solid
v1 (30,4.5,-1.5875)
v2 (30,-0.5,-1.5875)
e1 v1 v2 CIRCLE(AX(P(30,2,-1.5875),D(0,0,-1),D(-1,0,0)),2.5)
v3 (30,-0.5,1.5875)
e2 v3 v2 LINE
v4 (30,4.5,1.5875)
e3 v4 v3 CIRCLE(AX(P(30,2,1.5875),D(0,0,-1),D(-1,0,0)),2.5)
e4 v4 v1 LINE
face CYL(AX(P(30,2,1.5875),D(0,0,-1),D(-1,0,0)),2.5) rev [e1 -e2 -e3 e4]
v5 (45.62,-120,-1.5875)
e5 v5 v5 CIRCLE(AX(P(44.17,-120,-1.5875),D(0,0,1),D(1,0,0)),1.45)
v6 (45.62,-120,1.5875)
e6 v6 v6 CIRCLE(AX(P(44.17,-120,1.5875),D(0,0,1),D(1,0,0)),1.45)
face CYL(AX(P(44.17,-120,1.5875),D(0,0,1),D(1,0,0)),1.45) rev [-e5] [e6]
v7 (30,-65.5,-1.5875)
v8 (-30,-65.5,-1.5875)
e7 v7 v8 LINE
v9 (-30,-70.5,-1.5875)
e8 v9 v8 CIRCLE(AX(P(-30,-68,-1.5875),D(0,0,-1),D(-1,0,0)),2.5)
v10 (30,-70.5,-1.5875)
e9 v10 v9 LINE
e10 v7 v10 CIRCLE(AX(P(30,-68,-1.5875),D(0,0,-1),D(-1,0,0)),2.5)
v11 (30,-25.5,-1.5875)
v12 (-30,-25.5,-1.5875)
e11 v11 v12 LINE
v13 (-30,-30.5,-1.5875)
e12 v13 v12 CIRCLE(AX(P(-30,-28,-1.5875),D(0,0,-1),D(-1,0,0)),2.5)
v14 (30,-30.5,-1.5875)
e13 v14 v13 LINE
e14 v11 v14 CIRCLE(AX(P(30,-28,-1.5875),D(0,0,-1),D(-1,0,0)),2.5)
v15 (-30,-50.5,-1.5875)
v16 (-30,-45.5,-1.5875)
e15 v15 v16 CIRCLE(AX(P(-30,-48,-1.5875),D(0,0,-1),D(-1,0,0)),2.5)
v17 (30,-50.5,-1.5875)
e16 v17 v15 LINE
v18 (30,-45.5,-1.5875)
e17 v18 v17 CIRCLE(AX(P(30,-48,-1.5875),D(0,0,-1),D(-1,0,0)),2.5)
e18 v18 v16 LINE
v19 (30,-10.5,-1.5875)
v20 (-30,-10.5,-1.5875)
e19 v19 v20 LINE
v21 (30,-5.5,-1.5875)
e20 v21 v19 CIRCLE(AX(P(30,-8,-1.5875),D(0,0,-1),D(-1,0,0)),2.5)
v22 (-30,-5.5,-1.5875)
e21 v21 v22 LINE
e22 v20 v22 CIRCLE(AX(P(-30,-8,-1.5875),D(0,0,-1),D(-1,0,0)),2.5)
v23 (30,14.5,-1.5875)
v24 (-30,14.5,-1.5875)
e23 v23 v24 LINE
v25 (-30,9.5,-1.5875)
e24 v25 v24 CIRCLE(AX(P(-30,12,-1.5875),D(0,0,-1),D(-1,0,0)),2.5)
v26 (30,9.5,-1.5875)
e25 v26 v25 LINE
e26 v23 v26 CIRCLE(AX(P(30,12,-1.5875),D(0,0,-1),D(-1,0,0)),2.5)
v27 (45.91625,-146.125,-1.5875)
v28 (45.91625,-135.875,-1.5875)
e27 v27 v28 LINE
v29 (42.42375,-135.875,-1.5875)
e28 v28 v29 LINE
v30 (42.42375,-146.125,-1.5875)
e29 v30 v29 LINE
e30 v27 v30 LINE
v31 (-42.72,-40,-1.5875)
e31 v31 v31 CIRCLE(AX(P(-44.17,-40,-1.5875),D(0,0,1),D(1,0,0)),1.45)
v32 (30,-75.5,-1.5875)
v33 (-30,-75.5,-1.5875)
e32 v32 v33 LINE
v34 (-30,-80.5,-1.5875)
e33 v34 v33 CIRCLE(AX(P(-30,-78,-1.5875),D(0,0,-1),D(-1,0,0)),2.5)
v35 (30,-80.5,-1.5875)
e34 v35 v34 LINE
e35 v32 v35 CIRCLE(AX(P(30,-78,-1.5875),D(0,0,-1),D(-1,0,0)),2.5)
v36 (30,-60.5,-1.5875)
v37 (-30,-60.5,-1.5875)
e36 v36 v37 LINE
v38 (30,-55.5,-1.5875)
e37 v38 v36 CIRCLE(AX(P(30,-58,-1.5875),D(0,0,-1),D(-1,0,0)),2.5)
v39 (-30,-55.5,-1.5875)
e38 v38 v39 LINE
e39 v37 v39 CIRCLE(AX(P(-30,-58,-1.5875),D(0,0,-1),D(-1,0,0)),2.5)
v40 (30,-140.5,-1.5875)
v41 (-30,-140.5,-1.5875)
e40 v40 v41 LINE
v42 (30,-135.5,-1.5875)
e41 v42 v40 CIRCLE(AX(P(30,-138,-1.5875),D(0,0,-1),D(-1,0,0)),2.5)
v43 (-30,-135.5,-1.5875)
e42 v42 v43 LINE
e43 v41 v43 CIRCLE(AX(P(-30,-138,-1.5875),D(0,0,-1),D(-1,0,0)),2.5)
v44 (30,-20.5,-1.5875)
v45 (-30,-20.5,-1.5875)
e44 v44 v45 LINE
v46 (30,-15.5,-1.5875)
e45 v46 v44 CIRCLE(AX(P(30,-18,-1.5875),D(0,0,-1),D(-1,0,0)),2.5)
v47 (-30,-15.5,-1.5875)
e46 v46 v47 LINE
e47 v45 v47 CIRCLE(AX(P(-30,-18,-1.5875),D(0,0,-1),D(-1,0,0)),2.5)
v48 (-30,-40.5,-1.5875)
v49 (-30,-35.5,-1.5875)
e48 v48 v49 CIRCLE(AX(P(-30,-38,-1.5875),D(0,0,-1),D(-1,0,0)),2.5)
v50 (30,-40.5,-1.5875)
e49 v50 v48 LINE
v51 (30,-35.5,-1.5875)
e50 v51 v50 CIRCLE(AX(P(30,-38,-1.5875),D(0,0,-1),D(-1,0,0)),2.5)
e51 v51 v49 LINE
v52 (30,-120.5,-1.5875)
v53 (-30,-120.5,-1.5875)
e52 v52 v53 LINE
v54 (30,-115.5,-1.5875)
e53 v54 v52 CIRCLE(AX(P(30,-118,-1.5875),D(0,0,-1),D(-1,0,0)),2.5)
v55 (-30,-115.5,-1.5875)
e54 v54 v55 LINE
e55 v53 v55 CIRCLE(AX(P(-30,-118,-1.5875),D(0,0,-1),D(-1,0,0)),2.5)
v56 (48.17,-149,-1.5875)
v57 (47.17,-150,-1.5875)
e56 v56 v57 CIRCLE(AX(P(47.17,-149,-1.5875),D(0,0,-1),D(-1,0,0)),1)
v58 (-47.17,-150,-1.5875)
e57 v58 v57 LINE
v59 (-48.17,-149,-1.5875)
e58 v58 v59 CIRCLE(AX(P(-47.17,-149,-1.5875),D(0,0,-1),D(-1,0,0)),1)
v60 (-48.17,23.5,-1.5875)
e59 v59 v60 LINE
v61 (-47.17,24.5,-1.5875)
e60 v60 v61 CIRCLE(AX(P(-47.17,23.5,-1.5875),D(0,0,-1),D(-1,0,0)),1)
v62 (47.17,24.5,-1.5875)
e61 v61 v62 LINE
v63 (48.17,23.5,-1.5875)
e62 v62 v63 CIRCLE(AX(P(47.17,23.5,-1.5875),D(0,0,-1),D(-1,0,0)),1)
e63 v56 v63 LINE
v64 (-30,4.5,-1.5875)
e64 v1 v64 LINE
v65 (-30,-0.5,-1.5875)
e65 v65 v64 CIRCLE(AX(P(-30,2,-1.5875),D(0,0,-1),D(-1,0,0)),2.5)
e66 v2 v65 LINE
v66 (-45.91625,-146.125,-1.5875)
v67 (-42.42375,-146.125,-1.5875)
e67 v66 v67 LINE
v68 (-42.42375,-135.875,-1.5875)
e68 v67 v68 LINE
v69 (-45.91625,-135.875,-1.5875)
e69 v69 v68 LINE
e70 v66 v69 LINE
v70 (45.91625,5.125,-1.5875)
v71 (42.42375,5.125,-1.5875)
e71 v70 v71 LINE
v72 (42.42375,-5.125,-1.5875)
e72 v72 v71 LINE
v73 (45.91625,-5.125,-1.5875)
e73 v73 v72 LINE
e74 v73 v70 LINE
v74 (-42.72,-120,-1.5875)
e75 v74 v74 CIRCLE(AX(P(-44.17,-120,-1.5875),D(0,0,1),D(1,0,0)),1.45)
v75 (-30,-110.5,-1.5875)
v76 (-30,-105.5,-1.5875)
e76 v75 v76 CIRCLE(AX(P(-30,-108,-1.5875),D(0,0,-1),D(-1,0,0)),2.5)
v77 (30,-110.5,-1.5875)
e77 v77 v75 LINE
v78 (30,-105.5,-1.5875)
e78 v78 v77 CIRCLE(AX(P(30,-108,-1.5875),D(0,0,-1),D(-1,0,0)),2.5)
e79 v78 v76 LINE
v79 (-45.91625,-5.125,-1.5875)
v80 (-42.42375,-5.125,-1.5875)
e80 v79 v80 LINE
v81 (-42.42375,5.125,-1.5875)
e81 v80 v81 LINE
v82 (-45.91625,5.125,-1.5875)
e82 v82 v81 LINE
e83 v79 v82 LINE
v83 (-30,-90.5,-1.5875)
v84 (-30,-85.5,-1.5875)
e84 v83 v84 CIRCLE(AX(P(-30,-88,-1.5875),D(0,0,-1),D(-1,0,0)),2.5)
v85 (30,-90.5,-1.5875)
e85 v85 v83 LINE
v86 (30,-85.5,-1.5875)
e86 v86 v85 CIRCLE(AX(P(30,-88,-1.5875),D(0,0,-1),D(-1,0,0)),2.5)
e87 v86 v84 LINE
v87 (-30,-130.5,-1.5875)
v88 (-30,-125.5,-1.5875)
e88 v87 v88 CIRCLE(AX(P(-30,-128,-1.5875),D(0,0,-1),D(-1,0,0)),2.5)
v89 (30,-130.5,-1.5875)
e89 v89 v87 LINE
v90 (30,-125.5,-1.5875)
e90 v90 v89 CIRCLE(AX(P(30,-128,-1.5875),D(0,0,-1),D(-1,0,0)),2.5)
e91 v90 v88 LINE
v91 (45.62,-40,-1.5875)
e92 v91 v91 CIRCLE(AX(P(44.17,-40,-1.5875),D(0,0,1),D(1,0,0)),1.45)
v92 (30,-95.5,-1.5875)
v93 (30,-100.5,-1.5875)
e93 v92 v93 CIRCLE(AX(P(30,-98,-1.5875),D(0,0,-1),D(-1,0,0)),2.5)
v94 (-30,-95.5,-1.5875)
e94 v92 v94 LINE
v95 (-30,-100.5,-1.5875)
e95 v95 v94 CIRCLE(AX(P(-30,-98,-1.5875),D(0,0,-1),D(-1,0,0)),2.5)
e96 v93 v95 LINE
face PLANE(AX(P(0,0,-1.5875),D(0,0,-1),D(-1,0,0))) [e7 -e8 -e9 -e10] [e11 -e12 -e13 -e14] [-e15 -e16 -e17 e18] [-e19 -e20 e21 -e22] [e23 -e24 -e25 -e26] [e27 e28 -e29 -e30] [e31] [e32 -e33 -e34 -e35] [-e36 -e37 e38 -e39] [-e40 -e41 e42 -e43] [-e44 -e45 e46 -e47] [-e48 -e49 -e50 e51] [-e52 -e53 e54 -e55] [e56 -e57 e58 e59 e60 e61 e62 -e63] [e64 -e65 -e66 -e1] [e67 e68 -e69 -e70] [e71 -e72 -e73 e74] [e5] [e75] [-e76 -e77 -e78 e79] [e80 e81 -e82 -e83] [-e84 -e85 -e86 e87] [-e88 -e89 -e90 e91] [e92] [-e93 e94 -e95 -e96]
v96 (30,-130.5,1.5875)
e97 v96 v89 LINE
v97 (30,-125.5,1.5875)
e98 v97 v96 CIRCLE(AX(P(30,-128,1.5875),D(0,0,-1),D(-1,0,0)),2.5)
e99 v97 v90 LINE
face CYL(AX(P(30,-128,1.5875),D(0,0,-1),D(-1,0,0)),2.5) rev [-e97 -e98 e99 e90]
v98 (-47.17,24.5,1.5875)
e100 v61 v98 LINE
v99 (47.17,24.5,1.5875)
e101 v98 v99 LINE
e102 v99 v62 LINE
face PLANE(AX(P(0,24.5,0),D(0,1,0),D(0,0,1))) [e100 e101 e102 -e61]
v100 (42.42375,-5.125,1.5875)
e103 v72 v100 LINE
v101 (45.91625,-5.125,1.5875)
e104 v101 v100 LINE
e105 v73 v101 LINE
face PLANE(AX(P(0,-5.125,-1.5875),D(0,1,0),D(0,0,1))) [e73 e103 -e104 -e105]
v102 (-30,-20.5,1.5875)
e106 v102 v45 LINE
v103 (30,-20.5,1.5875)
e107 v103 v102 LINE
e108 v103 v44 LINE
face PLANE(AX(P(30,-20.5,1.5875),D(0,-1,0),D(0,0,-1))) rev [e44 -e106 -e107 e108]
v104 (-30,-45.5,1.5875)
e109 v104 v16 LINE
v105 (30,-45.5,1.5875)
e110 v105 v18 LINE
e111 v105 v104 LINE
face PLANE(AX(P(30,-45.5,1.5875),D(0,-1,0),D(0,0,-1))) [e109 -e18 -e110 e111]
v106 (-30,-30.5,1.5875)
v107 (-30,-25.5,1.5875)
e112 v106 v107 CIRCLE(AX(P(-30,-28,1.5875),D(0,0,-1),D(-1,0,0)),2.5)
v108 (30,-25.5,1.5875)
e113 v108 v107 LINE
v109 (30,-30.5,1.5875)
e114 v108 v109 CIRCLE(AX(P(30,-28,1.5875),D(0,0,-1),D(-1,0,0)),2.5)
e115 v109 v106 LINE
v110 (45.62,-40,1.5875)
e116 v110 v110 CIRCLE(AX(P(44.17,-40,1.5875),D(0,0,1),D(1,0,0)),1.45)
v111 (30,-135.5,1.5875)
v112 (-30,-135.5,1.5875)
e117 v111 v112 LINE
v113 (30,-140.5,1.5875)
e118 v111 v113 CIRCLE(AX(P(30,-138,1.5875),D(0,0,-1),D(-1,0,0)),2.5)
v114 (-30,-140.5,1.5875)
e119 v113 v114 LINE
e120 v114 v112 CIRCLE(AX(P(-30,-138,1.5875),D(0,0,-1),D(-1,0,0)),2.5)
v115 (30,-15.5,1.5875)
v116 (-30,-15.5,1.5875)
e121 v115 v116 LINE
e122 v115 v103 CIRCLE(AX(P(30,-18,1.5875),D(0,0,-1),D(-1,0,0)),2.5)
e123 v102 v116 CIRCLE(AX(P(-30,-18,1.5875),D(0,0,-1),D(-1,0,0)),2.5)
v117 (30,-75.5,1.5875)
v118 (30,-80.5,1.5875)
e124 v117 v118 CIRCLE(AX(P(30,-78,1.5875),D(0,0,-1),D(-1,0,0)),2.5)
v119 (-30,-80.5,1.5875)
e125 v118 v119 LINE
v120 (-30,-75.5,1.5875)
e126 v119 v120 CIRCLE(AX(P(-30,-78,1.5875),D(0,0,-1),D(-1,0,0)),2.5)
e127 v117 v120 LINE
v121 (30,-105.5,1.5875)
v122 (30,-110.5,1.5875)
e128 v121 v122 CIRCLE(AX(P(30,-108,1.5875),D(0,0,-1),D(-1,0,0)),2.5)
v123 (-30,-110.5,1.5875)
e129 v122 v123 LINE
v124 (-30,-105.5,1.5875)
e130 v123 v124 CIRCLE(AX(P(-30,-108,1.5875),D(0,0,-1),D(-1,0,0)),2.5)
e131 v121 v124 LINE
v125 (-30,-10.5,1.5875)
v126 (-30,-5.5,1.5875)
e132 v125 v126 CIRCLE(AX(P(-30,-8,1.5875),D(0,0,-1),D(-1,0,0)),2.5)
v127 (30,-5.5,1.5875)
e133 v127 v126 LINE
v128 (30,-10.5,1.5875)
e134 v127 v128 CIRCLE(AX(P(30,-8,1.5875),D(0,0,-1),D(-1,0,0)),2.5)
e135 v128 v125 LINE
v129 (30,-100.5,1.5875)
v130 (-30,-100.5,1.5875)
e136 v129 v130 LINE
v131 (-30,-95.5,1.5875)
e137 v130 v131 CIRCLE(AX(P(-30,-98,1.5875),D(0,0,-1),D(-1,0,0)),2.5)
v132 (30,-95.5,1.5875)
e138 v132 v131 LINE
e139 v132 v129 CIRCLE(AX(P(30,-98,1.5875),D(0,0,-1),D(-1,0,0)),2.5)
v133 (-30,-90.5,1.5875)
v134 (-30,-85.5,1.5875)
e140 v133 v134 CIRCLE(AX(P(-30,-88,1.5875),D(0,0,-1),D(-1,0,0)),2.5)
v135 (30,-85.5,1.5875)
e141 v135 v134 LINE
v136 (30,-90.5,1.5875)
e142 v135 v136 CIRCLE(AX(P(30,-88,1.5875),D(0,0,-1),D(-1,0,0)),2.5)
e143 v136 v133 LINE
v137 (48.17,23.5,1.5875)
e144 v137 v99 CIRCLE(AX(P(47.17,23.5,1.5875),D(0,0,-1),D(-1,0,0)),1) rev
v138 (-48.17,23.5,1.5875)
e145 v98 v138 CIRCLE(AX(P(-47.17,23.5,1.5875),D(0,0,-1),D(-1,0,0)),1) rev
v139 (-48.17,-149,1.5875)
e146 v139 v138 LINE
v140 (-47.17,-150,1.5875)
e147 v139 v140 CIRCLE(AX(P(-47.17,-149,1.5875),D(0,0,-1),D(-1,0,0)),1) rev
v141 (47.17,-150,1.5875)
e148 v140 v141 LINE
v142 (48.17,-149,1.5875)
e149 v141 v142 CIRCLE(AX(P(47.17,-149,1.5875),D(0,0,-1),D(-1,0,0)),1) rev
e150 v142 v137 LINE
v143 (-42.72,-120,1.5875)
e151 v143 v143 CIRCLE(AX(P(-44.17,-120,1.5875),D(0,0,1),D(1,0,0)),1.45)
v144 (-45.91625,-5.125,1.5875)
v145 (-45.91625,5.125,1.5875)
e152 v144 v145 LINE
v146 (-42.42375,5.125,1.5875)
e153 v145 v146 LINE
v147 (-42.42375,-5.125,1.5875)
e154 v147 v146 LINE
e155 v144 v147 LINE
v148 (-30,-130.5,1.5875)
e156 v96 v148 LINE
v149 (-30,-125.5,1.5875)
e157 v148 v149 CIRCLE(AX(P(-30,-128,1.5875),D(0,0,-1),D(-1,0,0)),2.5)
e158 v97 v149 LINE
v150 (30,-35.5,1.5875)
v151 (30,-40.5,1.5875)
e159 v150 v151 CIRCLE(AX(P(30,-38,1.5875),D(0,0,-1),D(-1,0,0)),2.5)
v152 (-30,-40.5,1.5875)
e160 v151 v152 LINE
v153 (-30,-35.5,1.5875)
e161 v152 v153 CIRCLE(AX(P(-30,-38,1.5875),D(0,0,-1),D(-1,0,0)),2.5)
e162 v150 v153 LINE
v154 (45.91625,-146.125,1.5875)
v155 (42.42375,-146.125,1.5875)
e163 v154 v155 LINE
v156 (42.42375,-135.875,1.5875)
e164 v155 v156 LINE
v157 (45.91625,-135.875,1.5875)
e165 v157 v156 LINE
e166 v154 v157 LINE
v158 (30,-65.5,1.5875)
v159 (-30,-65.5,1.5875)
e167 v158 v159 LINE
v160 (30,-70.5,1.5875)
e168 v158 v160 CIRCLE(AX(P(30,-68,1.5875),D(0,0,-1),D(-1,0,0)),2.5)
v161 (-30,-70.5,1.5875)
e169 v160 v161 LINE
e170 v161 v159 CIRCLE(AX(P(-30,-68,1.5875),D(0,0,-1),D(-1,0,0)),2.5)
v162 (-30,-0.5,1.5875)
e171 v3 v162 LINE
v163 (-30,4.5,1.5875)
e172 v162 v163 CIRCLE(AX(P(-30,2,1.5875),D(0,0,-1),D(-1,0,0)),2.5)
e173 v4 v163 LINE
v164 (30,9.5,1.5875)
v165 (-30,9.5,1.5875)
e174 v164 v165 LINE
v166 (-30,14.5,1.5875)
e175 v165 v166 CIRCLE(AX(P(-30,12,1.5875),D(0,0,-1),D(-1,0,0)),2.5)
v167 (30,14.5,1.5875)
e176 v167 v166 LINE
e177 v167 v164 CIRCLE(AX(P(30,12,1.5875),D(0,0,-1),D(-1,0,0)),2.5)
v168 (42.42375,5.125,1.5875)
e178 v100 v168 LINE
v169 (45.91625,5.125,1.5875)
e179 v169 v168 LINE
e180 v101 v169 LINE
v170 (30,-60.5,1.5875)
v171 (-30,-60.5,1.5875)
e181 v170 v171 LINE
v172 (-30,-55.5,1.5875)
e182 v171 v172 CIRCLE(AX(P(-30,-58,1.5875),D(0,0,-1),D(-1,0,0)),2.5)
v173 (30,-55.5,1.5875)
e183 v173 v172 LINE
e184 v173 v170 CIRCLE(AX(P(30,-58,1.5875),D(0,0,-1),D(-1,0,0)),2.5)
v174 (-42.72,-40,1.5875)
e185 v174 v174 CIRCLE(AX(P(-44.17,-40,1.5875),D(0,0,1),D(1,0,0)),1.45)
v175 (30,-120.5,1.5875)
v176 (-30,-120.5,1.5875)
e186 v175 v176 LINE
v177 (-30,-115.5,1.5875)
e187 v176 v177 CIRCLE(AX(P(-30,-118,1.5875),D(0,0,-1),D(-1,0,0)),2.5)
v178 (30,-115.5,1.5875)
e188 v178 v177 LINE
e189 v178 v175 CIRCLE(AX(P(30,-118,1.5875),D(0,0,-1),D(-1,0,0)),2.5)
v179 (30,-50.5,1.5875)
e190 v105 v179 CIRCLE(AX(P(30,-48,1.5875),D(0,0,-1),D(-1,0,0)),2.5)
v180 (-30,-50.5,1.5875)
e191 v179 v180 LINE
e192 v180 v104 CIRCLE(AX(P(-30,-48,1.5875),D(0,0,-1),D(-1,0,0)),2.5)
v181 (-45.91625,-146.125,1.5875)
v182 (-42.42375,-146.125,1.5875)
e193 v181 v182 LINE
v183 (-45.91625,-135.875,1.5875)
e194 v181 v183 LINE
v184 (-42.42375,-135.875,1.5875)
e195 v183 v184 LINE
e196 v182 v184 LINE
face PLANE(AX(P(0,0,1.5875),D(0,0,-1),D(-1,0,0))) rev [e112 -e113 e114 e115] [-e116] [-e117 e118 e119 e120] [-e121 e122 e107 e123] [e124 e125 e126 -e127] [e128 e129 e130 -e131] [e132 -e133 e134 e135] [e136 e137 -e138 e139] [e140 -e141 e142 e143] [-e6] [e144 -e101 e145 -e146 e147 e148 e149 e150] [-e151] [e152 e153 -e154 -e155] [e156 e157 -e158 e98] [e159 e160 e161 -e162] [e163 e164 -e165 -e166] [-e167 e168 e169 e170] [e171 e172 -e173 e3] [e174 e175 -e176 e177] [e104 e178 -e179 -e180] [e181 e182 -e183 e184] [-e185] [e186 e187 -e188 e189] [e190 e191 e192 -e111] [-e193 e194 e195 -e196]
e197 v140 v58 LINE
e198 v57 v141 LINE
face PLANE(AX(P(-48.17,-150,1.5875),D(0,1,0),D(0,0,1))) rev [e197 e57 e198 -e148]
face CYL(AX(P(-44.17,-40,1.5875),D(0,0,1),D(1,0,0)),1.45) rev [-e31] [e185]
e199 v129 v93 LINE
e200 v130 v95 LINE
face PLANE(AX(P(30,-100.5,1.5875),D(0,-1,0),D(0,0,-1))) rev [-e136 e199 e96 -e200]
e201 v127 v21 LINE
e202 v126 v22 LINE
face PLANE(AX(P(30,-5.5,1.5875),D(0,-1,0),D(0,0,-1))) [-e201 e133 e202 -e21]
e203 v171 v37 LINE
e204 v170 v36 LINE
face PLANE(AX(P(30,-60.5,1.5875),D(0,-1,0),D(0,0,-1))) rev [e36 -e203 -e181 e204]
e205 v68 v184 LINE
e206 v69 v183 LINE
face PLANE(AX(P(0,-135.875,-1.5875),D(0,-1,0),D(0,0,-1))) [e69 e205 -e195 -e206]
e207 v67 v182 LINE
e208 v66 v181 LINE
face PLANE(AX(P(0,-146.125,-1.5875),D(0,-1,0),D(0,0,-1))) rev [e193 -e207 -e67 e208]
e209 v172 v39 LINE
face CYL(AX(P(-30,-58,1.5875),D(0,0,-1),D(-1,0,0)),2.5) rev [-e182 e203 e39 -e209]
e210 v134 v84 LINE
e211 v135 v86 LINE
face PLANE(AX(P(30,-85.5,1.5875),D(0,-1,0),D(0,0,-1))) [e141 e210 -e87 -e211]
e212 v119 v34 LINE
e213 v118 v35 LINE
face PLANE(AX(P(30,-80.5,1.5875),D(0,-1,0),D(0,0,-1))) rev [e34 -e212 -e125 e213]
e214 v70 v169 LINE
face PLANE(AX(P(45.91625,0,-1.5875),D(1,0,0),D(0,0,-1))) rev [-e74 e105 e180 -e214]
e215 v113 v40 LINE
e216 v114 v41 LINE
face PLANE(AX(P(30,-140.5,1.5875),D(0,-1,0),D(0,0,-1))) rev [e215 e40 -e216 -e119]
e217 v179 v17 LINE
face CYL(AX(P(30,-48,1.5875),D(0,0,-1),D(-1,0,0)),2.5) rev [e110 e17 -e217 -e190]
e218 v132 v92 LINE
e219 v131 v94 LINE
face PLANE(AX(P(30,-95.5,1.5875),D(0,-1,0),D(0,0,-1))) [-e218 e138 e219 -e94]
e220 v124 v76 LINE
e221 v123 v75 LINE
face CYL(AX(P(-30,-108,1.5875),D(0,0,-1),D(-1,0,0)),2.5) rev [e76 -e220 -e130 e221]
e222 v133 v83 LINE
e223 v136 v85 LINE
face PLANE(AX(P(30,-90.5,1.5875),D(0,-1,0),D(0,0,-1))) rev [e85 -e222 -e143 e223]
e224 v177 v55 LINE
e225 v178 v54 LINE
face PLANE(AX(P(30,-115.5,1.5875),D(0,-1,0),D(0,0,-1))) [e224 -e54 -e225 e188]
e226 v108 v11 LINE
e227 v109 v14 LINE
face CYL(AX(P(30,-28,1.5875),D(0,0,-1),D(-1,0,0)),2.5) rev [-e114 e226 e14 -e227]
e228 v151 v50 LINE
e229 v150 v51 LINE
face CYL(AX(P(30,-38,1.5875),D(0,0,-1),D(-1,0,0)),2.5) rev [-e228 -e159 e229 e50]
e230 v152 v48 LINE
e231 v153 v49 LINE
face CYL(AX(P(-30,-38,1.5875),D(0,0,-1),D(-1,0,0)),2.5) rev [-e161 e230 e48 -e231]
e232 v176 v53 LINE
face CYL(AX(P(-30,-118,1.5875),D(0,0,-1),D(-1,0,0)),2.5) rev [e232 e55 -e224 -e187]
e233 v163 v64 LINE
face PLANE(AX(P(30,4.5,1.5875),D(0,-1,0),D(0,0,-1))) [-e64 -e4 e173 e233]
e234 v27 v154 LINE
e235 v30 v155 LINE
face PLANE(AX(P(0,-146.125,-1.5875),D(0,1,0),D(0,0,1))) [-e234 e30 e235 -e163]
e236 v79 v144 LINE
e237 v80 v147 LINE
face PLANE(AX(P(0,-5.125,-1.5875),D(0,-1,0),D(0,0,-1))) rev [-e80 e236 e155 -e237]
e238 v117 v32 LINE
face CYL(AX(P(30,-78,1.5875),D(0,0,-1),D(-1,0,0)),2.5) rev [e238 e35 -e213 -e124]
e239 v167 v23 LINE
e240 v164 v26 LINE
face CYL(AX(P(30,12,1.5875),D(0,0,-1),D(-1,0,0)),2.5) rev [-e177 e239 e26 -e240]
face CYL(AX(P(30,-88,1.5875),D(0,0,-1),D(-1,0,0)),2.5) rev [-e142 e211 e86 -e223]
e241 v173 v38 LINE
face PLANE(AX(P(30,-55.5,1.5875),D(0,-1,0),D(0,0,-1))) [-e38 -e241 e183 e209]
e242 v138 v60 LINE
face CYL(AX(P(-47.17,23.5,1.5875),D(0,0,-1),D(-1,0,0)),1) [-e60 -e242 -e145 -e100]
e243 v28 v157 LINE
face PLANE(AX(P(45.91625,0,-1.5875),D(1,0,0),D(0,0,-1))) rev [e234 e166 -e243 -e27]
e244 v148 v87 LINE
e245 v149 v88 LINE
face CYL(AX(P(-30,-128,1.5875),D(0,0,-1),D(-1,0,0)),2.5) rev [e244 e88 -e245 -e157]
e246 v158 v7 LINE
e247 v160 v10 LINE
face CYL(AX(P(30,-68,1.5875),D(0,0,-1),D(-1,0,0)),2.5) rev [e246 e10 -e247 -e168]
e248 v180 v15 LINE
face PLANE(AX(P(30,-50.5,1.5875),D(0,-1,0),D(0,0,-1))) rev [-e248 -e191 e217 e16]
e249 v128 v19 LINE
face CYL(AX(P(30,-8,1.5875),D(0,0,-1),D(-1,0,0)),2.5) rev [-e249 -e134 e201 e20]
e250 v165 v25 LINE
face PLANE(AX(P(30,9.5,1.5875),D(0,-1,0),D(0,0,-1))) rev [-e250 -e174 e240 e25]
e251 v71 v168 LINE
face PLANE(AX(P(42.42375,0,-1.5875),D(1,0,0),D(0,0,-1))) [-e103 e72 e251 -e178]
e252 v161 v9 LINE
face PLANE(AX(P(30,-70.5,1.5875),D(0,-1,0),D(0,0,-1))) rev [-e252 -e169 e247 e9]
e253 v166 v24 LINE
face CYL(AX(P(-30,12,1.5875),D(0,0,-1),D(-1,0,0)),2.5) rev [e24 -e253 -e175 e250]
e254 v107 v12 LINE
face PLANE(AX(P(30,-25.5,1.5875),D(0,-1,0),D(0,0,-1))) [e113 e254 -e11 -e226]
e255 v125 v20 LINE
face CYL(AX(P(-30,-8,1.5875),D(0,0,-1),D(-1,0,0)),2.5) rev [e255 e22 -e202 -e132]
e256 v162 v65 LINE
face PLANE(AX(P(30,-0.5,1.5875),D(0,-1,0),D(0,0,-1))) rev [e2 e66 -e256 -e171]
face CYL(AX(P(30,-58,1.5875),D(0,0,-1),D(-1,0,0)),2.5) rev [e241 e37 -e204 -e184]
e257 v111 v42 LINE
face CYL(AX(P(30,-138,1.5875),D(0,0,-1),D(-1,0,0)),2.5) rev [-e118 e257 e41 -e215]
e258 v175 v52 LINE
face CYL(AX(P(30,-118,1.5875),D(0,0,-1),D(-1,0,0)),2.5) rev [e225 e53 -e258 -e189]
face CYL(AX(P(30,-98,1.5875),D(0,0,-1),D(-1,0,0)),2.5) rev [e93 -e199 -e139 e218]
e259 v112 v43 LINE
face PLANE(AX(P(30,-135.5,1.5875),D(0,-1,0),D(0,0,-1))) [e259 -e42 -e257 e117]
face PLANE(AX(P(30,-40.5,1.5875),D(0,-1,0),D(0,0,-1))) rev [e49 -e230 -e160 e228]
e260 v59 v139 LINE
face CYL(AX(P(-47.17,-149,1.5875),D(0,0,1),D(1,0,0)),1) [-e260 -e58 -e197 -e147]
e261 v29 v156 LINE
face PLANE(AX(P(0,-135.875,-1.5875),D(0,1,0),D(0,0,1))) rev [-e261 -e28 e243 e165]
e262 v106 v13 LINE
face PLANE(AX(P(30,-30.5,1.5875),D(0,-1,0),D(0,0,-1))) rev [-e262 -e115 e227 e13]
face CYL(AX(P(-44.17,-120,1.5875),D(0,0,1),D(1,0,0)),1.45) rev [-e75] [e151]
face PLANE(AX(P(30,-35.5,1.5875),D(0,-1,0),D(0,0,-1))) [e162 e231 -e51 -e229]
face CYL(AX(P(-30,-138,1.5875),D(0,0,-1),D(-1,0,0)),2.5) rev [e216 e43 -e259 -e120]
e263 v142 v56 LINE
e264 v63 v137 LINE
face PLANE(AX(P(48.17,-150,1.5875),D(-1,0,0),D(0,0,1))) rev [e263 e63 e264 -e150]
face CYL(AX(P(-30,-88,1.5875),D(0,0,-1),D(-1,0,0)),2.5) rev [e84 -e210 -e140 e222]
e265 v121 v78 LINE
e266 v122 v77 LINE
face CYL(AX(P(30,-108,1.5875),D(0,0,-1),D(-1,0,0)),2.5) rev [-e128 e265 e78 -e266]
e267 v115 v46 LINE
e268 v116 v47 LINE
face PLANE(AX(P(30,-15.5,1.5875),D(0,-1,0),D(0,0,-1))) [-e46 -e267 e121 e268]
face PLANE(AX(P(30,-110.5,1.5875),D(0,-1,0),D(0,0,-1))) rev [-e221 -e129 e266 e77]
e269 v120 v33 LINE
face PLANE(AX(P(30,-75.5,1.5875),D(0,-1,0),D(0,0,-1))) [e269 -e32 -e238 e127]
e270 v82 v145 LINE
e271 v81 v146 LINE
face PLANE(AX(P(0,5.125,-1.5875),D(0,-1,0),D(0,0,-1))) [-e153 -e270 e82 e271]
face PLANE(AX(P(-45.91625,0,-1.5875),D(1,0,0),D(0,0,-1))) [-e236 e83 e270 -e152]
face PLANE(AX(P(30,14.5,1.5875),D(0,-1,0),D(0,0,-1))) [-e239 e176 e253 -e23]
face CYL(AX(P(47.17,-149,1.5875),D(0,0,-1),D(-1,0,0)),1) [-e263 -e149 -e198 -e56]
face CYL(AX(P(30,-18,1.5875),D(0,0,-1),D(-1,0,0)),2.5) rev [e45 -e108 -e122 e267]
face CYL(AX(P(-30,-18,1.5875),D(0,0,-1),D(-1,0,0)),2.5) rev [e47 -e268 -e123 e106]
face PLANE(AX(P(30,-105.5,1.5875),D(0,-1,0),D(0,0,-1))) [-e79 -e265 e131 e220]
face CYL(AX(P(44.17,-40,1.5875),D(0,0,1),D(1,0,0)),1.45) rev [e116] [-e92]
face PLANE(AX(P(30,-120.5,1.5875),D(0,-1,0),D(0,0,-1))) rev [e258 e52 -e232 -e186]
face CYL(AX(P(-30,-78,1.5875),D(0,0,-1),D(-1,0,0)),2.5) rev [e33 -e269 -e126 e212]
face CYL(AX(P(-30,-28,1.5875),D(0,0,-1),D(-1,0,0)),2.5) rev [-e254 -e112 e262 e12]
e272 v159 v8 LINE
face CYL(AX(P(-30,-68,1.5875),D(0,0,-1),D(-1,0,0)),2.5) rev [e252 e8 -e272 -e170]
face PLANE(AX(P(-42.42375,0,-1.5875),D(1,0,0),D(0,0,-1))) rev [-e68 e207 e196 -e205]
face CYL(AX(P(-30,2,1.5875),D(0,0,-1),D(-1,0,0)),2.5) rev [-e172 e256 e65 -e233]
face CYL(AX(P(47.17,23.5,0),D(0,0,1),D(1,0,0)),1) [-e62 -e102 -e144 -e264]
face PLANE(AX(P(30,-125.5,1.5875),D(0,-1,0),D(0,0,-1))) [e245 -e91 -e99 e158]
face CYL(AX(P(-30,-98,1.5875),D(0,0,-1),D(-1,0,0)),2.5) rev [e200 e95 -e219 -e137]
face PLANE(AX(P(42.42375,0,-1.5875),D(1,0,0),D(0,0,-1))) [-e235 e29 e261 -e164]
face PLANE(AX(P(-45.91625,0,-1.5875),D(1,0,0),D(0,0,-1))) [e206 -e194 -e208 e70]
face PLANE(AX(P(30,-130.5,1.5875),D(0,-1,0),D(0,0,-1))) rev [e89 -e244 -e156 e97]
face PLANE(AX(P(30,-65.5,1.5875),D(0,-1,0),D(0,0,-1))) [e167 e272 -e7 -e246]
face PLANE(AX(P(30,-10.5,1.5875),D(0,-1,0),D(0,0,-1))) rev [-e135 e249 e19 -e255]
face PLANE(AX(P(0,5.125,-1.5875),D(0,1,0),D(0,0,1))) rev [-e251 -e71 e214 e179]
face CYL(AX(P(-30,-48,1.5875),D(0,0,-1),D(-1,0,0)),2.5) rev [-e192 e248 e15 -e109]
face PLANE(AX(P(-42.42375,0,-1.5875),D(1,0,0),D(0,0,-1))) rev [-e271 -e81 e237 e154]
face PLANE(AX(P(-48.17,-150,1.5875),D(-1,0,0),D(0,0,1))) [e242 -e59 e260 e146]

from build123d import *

# Parameters (mm, degrees)
STOCK_TORSO_REAR_PLATE_1_START       = -1.5875
STOCK_TORSO_REAR_PLATE_1_OUTLINE_W   = 96.34
STOCK_TORSO_REAR_PLATE_1_OUTLINE_H   = 174.5
STOCK_TORSO_REAR_PLATE_1_OUTLINE_W_2 = 3.4925
STOCK_TORSO_REAR_PLATE_1_OUTLINE_H_2 = 10.25
STOCK_TORSO_REAR_PLATE_1_OUTLINE_R   = 1.45
STOCK_TORSO_REAR_PLATE_1_DEPTH       = 3.175
FILLET1_R                            = 1


# Read off the part's stored shape, not the designer's step: Stock-torso_rear_plate-1
with BuildPart() as part:
    # Stock-torso_rear_plate-1 outline → Stock-torso_rear_plate-1 (new body)
    with BuildSketch(Plane.XY.offset(STOCK_TORSO_REAR_PLATE_1_START)):
        with Locations((0, -62.75)):
            Rectangle(STOCK_TORSO_REAR_PLATE_1_OUTLINE_W, STOCK_TORSO_REAR_PLATE_1_OUTLINE_H)
        with Locations((-44.17, -141)):
            Rectangle(STOCK_TORSO_REAR_PLATE_1_OUTLINE_W_2, STOCK_TORSO_REAR_PLATE_1_OUTLINE_H_2, mode=Mode.SUBTRACT)
        with Locations((-44.17, -120)):
            Circle(STOCK_TORSO_REAR_PLATE_1_OUTLINE_R, mode=Mode.SUBTRACT)
        with BuildLine():
            Line((30, -140.5), (-30, -140.5))
            ThreePointArc((-30, -140.5), (-32.5, -138), (-30, -135.5))
            Line((-30, -135.5), (30, -135.5))
            ThreePointArc((30, -135.5), (32.5, -138), (30, -140.5))
        make_face(mode=Mode.SUBTRACT)
        with BuildLine():
            Line((30, -130.5), (-30, -130.5))
            ThreePointArc((-30, -130.5), (-32.5, -128), (-30, -125.5))
            Line((-30, -125.5), (30, -125.5))
            ThreePointArc((30, -125.5), (32.5, -128), (30, -130.5))
        make_face(mode=Mode.SUBTRACT)
        with BuildLine():
            Line((30, -120.5), (-30, -120.5))
            ThreePointArc((-30, -120.5), (-32.5, -118), (-30, -115.5))
            Line((-30, -115.5), (30, -115.5))
            ThreePointArc((30, -115.5), (32.5, -118), (30, -120.5))
        make_face(mode=Mode.SUBTRACT)
        with BuildLine():
            Line((30, -110.5), (-30, -110.5))
            ThreePointArc((-30, -110.5), (-32.5, -108), (-30, -105.5))
            Line((-30, -105.5), (30, -105.5))
            ThreePointArc((30, -105.5), (32.5, -108), (30, -110.5))
        make_face(mode=Mode.SUBTRACT)
        with Locations((44.17, -141)):
            Rectangle(STOCK_TORSO_REAR_PLATE_1_OUTLINE_W_2, STOCK_TORSO_REAR_PLATE_1_OUTLINE_H_2, mode=Mode.SUBTRACT)
        with Locations((44.17, -120)):
            Circle(STOCK_TORSO_REAR_PLATE_1_OUTLINE_R, mode=Mode.SUBTRACT)
        with BuildLine():
            Line((30, -100.5), (-30, -100.5))
            ThreePointArc((-30, -100.5), (-32.5, -98), (-30, -95.5))
            Line((-30, -95.5), (30, -95.5))
            ThreePointArc((30, -95.5), (32.5, -98), (30, -100.5))
        make_face(mode=Mode.SUBTRACT)
        with BuildLine():
            Line((30, -90.5), (-30, -90.5))
            ThreePointArc((-30, -90.5), (-32.5, -88), (-30, -85.5))
            Line((-30, -85.5), (30, -85.5))
            ThreePointArc((30, -85.5), (32.5, -88), (30, -90.5))
        make_face(mode=Mode.SUBTRACT)
        with BuildLine():
            Line((30, -80.5), (-30, -80.5))
            ThreePointArc((-30, -80.5), (-32.5, -78), (-30, -75.5))
            Line((-30, -75.5), (30, -75.5))
            ThreePointArc((30, -75.5), (32.5, -78), (30, -80.5))
        make_face(mode=Mode.SUBTRACT)
        with BuildLine():
            Line((30, -70.5), (-30, -70.5))
            ThreePointArc((-30, -70.5), (-32.5, -68), (-30, -65.5))
            Line((-30, -65.5), (30, -65.5))
            ThreePointArc((30, -65.5), (32.5, -68), (30, -70.5))
        make_face(mode=Mode.SUBTRACT)
        with Locations((-44.17, -40)):
            Circle(STOCK_TORSO_REAR_PLATE_1_OUTLINE_R, mode=Mode.SUBTRACT)
        with Locations((-44.17, 0)):
            Rectangle(STOCK_TORSO_REAR_PLATE_1_OUTLINE_W_2, STOCK_TORSO_REAR_PLATE_1_OUTLINE_H_2, mode=Mode.SUBTRACT)
        with BuildLine():
            Line((30, -60.5), (-30, -60.5))
            ThreePointArc((-30, -60.5), (-32.5, -58), (-30, -55.5))
            Line((-30, -55.5), (30, -55.5))
            ThreePointArc((30, -55.5), (32.5, -58), (30, -60.5))
        make_face(mode=Mode.SUBTRACT)
        with BuildLine():
            Line((30, -50.5), (-30, -50.5))
            ThreePointArc((-30, -50.5), (-32.5, -48), (-30, -45.5))
            Line((-30, -45.5), (30, -45.5))
            ThreePointArc((30, -45.5), (32.5, -48), (30, -50.5))
        make_face(mode=Mode.SUBTRACT)
        with BuildLine():
            Line((30, -40.5), (-30, -40.5))
            ThreePointArc((-30, -40.5), (-32.5, -38), (-30, -35.5))
            Line((-30, -35.5), (30, -35.5))
            ThreePointArc((30, -35.5), (32.5, -38), (30, -40.5))
        make_face(mode=Mode.SUBTRACT)
        with BuildLine():
            Line((30, -30.5), (-30, -30.5))
            ThreePointArc((-30, -30.5), (-32.5, -28), (-30, -25.5))
            Line((-30, -25.5), (30, -25.5))
            ThreePointArc((30, -25.5), (32.5, -28), (30, -30.5))
        make_face(mode=Mode.SUBTRACT)
        with Locations((44.17, -40)):
            Circle(STOCK_TORSO_REAR_PLATE_1_OUTLINE_R, mode=Mode.SUBTRACT)
        with BuildLine():
            Line((30, -20.5), (-30, -20.5))
            ThreePointArc((-30, -20.5), (-32.5, -18), (-30, -15.5))
            Line((-30, -15.5), (30, -15.5))
            ThreePointArc((30, -15.5), (32.5, -18), (30, -20.5))
        make_face(mode=Mode.SUBTRACT)
        with BuildLine():
            Line((30, -10.5), (-30, -10.5))
            ThreePointArc((-30, -10.5), (-32.5, -8), (-30, -5.5))
            Line((-30, -5.5), (30, -5.5))
            ThreePointArc((30, -5.5), (32.5, -8), (30, -10.5))
        make_face(mode=Mode.SUBTRACT)
        with BuildLine():
            Line((-30, 4.5), (30, 4.5))
            ThreePointArc((30, 4.5), (32.5, 2), (30, -0.5))
            Line((30, -0.5), (-30, -0.5))
            ThreePointArc((-30, -0.5), (-32.5, 2), (-30, 4.5))
        make_face(mode=Mode.SUBTRACT)
        with BuildLine():
            Line((-30, 14.5), (30, 14.5))
            ThreePointArc((30, 14.5), (32.5, 12), (30, 9.5))
            Line((30, 9.5), (-30, 9.5))
            ThreePointArc((-30, 9.5), (-32.5, 12), (-30, 14.5))
        make_face(mode=Mode.SUBTRACT)
        with Locations((44.17, 0)):
            Rectangle(STOCK_TORSO_REAR_PLATE_1_OUTLINE_W_2, STOCK_TORSO_REAR_PLATE_1_OUTLINE_H_2, mode=Mode.SUBTRACT)
    extrude(amount=STOCK_TORSO_REAR_PLATE_1_DEPTH)

    # Fillet1
    fillet1_edges = [part.edges().sort_by_distance(p)[0] for p in [
        (-48.17, 24.5, 0),
        (48.17, 24.5, 0),
        (48.17, -150, 0),
        (-48.17, -150, 0),
    ]]
    fillet(fillet1_edges, radius=FILLET1_R)


solid = part.part
